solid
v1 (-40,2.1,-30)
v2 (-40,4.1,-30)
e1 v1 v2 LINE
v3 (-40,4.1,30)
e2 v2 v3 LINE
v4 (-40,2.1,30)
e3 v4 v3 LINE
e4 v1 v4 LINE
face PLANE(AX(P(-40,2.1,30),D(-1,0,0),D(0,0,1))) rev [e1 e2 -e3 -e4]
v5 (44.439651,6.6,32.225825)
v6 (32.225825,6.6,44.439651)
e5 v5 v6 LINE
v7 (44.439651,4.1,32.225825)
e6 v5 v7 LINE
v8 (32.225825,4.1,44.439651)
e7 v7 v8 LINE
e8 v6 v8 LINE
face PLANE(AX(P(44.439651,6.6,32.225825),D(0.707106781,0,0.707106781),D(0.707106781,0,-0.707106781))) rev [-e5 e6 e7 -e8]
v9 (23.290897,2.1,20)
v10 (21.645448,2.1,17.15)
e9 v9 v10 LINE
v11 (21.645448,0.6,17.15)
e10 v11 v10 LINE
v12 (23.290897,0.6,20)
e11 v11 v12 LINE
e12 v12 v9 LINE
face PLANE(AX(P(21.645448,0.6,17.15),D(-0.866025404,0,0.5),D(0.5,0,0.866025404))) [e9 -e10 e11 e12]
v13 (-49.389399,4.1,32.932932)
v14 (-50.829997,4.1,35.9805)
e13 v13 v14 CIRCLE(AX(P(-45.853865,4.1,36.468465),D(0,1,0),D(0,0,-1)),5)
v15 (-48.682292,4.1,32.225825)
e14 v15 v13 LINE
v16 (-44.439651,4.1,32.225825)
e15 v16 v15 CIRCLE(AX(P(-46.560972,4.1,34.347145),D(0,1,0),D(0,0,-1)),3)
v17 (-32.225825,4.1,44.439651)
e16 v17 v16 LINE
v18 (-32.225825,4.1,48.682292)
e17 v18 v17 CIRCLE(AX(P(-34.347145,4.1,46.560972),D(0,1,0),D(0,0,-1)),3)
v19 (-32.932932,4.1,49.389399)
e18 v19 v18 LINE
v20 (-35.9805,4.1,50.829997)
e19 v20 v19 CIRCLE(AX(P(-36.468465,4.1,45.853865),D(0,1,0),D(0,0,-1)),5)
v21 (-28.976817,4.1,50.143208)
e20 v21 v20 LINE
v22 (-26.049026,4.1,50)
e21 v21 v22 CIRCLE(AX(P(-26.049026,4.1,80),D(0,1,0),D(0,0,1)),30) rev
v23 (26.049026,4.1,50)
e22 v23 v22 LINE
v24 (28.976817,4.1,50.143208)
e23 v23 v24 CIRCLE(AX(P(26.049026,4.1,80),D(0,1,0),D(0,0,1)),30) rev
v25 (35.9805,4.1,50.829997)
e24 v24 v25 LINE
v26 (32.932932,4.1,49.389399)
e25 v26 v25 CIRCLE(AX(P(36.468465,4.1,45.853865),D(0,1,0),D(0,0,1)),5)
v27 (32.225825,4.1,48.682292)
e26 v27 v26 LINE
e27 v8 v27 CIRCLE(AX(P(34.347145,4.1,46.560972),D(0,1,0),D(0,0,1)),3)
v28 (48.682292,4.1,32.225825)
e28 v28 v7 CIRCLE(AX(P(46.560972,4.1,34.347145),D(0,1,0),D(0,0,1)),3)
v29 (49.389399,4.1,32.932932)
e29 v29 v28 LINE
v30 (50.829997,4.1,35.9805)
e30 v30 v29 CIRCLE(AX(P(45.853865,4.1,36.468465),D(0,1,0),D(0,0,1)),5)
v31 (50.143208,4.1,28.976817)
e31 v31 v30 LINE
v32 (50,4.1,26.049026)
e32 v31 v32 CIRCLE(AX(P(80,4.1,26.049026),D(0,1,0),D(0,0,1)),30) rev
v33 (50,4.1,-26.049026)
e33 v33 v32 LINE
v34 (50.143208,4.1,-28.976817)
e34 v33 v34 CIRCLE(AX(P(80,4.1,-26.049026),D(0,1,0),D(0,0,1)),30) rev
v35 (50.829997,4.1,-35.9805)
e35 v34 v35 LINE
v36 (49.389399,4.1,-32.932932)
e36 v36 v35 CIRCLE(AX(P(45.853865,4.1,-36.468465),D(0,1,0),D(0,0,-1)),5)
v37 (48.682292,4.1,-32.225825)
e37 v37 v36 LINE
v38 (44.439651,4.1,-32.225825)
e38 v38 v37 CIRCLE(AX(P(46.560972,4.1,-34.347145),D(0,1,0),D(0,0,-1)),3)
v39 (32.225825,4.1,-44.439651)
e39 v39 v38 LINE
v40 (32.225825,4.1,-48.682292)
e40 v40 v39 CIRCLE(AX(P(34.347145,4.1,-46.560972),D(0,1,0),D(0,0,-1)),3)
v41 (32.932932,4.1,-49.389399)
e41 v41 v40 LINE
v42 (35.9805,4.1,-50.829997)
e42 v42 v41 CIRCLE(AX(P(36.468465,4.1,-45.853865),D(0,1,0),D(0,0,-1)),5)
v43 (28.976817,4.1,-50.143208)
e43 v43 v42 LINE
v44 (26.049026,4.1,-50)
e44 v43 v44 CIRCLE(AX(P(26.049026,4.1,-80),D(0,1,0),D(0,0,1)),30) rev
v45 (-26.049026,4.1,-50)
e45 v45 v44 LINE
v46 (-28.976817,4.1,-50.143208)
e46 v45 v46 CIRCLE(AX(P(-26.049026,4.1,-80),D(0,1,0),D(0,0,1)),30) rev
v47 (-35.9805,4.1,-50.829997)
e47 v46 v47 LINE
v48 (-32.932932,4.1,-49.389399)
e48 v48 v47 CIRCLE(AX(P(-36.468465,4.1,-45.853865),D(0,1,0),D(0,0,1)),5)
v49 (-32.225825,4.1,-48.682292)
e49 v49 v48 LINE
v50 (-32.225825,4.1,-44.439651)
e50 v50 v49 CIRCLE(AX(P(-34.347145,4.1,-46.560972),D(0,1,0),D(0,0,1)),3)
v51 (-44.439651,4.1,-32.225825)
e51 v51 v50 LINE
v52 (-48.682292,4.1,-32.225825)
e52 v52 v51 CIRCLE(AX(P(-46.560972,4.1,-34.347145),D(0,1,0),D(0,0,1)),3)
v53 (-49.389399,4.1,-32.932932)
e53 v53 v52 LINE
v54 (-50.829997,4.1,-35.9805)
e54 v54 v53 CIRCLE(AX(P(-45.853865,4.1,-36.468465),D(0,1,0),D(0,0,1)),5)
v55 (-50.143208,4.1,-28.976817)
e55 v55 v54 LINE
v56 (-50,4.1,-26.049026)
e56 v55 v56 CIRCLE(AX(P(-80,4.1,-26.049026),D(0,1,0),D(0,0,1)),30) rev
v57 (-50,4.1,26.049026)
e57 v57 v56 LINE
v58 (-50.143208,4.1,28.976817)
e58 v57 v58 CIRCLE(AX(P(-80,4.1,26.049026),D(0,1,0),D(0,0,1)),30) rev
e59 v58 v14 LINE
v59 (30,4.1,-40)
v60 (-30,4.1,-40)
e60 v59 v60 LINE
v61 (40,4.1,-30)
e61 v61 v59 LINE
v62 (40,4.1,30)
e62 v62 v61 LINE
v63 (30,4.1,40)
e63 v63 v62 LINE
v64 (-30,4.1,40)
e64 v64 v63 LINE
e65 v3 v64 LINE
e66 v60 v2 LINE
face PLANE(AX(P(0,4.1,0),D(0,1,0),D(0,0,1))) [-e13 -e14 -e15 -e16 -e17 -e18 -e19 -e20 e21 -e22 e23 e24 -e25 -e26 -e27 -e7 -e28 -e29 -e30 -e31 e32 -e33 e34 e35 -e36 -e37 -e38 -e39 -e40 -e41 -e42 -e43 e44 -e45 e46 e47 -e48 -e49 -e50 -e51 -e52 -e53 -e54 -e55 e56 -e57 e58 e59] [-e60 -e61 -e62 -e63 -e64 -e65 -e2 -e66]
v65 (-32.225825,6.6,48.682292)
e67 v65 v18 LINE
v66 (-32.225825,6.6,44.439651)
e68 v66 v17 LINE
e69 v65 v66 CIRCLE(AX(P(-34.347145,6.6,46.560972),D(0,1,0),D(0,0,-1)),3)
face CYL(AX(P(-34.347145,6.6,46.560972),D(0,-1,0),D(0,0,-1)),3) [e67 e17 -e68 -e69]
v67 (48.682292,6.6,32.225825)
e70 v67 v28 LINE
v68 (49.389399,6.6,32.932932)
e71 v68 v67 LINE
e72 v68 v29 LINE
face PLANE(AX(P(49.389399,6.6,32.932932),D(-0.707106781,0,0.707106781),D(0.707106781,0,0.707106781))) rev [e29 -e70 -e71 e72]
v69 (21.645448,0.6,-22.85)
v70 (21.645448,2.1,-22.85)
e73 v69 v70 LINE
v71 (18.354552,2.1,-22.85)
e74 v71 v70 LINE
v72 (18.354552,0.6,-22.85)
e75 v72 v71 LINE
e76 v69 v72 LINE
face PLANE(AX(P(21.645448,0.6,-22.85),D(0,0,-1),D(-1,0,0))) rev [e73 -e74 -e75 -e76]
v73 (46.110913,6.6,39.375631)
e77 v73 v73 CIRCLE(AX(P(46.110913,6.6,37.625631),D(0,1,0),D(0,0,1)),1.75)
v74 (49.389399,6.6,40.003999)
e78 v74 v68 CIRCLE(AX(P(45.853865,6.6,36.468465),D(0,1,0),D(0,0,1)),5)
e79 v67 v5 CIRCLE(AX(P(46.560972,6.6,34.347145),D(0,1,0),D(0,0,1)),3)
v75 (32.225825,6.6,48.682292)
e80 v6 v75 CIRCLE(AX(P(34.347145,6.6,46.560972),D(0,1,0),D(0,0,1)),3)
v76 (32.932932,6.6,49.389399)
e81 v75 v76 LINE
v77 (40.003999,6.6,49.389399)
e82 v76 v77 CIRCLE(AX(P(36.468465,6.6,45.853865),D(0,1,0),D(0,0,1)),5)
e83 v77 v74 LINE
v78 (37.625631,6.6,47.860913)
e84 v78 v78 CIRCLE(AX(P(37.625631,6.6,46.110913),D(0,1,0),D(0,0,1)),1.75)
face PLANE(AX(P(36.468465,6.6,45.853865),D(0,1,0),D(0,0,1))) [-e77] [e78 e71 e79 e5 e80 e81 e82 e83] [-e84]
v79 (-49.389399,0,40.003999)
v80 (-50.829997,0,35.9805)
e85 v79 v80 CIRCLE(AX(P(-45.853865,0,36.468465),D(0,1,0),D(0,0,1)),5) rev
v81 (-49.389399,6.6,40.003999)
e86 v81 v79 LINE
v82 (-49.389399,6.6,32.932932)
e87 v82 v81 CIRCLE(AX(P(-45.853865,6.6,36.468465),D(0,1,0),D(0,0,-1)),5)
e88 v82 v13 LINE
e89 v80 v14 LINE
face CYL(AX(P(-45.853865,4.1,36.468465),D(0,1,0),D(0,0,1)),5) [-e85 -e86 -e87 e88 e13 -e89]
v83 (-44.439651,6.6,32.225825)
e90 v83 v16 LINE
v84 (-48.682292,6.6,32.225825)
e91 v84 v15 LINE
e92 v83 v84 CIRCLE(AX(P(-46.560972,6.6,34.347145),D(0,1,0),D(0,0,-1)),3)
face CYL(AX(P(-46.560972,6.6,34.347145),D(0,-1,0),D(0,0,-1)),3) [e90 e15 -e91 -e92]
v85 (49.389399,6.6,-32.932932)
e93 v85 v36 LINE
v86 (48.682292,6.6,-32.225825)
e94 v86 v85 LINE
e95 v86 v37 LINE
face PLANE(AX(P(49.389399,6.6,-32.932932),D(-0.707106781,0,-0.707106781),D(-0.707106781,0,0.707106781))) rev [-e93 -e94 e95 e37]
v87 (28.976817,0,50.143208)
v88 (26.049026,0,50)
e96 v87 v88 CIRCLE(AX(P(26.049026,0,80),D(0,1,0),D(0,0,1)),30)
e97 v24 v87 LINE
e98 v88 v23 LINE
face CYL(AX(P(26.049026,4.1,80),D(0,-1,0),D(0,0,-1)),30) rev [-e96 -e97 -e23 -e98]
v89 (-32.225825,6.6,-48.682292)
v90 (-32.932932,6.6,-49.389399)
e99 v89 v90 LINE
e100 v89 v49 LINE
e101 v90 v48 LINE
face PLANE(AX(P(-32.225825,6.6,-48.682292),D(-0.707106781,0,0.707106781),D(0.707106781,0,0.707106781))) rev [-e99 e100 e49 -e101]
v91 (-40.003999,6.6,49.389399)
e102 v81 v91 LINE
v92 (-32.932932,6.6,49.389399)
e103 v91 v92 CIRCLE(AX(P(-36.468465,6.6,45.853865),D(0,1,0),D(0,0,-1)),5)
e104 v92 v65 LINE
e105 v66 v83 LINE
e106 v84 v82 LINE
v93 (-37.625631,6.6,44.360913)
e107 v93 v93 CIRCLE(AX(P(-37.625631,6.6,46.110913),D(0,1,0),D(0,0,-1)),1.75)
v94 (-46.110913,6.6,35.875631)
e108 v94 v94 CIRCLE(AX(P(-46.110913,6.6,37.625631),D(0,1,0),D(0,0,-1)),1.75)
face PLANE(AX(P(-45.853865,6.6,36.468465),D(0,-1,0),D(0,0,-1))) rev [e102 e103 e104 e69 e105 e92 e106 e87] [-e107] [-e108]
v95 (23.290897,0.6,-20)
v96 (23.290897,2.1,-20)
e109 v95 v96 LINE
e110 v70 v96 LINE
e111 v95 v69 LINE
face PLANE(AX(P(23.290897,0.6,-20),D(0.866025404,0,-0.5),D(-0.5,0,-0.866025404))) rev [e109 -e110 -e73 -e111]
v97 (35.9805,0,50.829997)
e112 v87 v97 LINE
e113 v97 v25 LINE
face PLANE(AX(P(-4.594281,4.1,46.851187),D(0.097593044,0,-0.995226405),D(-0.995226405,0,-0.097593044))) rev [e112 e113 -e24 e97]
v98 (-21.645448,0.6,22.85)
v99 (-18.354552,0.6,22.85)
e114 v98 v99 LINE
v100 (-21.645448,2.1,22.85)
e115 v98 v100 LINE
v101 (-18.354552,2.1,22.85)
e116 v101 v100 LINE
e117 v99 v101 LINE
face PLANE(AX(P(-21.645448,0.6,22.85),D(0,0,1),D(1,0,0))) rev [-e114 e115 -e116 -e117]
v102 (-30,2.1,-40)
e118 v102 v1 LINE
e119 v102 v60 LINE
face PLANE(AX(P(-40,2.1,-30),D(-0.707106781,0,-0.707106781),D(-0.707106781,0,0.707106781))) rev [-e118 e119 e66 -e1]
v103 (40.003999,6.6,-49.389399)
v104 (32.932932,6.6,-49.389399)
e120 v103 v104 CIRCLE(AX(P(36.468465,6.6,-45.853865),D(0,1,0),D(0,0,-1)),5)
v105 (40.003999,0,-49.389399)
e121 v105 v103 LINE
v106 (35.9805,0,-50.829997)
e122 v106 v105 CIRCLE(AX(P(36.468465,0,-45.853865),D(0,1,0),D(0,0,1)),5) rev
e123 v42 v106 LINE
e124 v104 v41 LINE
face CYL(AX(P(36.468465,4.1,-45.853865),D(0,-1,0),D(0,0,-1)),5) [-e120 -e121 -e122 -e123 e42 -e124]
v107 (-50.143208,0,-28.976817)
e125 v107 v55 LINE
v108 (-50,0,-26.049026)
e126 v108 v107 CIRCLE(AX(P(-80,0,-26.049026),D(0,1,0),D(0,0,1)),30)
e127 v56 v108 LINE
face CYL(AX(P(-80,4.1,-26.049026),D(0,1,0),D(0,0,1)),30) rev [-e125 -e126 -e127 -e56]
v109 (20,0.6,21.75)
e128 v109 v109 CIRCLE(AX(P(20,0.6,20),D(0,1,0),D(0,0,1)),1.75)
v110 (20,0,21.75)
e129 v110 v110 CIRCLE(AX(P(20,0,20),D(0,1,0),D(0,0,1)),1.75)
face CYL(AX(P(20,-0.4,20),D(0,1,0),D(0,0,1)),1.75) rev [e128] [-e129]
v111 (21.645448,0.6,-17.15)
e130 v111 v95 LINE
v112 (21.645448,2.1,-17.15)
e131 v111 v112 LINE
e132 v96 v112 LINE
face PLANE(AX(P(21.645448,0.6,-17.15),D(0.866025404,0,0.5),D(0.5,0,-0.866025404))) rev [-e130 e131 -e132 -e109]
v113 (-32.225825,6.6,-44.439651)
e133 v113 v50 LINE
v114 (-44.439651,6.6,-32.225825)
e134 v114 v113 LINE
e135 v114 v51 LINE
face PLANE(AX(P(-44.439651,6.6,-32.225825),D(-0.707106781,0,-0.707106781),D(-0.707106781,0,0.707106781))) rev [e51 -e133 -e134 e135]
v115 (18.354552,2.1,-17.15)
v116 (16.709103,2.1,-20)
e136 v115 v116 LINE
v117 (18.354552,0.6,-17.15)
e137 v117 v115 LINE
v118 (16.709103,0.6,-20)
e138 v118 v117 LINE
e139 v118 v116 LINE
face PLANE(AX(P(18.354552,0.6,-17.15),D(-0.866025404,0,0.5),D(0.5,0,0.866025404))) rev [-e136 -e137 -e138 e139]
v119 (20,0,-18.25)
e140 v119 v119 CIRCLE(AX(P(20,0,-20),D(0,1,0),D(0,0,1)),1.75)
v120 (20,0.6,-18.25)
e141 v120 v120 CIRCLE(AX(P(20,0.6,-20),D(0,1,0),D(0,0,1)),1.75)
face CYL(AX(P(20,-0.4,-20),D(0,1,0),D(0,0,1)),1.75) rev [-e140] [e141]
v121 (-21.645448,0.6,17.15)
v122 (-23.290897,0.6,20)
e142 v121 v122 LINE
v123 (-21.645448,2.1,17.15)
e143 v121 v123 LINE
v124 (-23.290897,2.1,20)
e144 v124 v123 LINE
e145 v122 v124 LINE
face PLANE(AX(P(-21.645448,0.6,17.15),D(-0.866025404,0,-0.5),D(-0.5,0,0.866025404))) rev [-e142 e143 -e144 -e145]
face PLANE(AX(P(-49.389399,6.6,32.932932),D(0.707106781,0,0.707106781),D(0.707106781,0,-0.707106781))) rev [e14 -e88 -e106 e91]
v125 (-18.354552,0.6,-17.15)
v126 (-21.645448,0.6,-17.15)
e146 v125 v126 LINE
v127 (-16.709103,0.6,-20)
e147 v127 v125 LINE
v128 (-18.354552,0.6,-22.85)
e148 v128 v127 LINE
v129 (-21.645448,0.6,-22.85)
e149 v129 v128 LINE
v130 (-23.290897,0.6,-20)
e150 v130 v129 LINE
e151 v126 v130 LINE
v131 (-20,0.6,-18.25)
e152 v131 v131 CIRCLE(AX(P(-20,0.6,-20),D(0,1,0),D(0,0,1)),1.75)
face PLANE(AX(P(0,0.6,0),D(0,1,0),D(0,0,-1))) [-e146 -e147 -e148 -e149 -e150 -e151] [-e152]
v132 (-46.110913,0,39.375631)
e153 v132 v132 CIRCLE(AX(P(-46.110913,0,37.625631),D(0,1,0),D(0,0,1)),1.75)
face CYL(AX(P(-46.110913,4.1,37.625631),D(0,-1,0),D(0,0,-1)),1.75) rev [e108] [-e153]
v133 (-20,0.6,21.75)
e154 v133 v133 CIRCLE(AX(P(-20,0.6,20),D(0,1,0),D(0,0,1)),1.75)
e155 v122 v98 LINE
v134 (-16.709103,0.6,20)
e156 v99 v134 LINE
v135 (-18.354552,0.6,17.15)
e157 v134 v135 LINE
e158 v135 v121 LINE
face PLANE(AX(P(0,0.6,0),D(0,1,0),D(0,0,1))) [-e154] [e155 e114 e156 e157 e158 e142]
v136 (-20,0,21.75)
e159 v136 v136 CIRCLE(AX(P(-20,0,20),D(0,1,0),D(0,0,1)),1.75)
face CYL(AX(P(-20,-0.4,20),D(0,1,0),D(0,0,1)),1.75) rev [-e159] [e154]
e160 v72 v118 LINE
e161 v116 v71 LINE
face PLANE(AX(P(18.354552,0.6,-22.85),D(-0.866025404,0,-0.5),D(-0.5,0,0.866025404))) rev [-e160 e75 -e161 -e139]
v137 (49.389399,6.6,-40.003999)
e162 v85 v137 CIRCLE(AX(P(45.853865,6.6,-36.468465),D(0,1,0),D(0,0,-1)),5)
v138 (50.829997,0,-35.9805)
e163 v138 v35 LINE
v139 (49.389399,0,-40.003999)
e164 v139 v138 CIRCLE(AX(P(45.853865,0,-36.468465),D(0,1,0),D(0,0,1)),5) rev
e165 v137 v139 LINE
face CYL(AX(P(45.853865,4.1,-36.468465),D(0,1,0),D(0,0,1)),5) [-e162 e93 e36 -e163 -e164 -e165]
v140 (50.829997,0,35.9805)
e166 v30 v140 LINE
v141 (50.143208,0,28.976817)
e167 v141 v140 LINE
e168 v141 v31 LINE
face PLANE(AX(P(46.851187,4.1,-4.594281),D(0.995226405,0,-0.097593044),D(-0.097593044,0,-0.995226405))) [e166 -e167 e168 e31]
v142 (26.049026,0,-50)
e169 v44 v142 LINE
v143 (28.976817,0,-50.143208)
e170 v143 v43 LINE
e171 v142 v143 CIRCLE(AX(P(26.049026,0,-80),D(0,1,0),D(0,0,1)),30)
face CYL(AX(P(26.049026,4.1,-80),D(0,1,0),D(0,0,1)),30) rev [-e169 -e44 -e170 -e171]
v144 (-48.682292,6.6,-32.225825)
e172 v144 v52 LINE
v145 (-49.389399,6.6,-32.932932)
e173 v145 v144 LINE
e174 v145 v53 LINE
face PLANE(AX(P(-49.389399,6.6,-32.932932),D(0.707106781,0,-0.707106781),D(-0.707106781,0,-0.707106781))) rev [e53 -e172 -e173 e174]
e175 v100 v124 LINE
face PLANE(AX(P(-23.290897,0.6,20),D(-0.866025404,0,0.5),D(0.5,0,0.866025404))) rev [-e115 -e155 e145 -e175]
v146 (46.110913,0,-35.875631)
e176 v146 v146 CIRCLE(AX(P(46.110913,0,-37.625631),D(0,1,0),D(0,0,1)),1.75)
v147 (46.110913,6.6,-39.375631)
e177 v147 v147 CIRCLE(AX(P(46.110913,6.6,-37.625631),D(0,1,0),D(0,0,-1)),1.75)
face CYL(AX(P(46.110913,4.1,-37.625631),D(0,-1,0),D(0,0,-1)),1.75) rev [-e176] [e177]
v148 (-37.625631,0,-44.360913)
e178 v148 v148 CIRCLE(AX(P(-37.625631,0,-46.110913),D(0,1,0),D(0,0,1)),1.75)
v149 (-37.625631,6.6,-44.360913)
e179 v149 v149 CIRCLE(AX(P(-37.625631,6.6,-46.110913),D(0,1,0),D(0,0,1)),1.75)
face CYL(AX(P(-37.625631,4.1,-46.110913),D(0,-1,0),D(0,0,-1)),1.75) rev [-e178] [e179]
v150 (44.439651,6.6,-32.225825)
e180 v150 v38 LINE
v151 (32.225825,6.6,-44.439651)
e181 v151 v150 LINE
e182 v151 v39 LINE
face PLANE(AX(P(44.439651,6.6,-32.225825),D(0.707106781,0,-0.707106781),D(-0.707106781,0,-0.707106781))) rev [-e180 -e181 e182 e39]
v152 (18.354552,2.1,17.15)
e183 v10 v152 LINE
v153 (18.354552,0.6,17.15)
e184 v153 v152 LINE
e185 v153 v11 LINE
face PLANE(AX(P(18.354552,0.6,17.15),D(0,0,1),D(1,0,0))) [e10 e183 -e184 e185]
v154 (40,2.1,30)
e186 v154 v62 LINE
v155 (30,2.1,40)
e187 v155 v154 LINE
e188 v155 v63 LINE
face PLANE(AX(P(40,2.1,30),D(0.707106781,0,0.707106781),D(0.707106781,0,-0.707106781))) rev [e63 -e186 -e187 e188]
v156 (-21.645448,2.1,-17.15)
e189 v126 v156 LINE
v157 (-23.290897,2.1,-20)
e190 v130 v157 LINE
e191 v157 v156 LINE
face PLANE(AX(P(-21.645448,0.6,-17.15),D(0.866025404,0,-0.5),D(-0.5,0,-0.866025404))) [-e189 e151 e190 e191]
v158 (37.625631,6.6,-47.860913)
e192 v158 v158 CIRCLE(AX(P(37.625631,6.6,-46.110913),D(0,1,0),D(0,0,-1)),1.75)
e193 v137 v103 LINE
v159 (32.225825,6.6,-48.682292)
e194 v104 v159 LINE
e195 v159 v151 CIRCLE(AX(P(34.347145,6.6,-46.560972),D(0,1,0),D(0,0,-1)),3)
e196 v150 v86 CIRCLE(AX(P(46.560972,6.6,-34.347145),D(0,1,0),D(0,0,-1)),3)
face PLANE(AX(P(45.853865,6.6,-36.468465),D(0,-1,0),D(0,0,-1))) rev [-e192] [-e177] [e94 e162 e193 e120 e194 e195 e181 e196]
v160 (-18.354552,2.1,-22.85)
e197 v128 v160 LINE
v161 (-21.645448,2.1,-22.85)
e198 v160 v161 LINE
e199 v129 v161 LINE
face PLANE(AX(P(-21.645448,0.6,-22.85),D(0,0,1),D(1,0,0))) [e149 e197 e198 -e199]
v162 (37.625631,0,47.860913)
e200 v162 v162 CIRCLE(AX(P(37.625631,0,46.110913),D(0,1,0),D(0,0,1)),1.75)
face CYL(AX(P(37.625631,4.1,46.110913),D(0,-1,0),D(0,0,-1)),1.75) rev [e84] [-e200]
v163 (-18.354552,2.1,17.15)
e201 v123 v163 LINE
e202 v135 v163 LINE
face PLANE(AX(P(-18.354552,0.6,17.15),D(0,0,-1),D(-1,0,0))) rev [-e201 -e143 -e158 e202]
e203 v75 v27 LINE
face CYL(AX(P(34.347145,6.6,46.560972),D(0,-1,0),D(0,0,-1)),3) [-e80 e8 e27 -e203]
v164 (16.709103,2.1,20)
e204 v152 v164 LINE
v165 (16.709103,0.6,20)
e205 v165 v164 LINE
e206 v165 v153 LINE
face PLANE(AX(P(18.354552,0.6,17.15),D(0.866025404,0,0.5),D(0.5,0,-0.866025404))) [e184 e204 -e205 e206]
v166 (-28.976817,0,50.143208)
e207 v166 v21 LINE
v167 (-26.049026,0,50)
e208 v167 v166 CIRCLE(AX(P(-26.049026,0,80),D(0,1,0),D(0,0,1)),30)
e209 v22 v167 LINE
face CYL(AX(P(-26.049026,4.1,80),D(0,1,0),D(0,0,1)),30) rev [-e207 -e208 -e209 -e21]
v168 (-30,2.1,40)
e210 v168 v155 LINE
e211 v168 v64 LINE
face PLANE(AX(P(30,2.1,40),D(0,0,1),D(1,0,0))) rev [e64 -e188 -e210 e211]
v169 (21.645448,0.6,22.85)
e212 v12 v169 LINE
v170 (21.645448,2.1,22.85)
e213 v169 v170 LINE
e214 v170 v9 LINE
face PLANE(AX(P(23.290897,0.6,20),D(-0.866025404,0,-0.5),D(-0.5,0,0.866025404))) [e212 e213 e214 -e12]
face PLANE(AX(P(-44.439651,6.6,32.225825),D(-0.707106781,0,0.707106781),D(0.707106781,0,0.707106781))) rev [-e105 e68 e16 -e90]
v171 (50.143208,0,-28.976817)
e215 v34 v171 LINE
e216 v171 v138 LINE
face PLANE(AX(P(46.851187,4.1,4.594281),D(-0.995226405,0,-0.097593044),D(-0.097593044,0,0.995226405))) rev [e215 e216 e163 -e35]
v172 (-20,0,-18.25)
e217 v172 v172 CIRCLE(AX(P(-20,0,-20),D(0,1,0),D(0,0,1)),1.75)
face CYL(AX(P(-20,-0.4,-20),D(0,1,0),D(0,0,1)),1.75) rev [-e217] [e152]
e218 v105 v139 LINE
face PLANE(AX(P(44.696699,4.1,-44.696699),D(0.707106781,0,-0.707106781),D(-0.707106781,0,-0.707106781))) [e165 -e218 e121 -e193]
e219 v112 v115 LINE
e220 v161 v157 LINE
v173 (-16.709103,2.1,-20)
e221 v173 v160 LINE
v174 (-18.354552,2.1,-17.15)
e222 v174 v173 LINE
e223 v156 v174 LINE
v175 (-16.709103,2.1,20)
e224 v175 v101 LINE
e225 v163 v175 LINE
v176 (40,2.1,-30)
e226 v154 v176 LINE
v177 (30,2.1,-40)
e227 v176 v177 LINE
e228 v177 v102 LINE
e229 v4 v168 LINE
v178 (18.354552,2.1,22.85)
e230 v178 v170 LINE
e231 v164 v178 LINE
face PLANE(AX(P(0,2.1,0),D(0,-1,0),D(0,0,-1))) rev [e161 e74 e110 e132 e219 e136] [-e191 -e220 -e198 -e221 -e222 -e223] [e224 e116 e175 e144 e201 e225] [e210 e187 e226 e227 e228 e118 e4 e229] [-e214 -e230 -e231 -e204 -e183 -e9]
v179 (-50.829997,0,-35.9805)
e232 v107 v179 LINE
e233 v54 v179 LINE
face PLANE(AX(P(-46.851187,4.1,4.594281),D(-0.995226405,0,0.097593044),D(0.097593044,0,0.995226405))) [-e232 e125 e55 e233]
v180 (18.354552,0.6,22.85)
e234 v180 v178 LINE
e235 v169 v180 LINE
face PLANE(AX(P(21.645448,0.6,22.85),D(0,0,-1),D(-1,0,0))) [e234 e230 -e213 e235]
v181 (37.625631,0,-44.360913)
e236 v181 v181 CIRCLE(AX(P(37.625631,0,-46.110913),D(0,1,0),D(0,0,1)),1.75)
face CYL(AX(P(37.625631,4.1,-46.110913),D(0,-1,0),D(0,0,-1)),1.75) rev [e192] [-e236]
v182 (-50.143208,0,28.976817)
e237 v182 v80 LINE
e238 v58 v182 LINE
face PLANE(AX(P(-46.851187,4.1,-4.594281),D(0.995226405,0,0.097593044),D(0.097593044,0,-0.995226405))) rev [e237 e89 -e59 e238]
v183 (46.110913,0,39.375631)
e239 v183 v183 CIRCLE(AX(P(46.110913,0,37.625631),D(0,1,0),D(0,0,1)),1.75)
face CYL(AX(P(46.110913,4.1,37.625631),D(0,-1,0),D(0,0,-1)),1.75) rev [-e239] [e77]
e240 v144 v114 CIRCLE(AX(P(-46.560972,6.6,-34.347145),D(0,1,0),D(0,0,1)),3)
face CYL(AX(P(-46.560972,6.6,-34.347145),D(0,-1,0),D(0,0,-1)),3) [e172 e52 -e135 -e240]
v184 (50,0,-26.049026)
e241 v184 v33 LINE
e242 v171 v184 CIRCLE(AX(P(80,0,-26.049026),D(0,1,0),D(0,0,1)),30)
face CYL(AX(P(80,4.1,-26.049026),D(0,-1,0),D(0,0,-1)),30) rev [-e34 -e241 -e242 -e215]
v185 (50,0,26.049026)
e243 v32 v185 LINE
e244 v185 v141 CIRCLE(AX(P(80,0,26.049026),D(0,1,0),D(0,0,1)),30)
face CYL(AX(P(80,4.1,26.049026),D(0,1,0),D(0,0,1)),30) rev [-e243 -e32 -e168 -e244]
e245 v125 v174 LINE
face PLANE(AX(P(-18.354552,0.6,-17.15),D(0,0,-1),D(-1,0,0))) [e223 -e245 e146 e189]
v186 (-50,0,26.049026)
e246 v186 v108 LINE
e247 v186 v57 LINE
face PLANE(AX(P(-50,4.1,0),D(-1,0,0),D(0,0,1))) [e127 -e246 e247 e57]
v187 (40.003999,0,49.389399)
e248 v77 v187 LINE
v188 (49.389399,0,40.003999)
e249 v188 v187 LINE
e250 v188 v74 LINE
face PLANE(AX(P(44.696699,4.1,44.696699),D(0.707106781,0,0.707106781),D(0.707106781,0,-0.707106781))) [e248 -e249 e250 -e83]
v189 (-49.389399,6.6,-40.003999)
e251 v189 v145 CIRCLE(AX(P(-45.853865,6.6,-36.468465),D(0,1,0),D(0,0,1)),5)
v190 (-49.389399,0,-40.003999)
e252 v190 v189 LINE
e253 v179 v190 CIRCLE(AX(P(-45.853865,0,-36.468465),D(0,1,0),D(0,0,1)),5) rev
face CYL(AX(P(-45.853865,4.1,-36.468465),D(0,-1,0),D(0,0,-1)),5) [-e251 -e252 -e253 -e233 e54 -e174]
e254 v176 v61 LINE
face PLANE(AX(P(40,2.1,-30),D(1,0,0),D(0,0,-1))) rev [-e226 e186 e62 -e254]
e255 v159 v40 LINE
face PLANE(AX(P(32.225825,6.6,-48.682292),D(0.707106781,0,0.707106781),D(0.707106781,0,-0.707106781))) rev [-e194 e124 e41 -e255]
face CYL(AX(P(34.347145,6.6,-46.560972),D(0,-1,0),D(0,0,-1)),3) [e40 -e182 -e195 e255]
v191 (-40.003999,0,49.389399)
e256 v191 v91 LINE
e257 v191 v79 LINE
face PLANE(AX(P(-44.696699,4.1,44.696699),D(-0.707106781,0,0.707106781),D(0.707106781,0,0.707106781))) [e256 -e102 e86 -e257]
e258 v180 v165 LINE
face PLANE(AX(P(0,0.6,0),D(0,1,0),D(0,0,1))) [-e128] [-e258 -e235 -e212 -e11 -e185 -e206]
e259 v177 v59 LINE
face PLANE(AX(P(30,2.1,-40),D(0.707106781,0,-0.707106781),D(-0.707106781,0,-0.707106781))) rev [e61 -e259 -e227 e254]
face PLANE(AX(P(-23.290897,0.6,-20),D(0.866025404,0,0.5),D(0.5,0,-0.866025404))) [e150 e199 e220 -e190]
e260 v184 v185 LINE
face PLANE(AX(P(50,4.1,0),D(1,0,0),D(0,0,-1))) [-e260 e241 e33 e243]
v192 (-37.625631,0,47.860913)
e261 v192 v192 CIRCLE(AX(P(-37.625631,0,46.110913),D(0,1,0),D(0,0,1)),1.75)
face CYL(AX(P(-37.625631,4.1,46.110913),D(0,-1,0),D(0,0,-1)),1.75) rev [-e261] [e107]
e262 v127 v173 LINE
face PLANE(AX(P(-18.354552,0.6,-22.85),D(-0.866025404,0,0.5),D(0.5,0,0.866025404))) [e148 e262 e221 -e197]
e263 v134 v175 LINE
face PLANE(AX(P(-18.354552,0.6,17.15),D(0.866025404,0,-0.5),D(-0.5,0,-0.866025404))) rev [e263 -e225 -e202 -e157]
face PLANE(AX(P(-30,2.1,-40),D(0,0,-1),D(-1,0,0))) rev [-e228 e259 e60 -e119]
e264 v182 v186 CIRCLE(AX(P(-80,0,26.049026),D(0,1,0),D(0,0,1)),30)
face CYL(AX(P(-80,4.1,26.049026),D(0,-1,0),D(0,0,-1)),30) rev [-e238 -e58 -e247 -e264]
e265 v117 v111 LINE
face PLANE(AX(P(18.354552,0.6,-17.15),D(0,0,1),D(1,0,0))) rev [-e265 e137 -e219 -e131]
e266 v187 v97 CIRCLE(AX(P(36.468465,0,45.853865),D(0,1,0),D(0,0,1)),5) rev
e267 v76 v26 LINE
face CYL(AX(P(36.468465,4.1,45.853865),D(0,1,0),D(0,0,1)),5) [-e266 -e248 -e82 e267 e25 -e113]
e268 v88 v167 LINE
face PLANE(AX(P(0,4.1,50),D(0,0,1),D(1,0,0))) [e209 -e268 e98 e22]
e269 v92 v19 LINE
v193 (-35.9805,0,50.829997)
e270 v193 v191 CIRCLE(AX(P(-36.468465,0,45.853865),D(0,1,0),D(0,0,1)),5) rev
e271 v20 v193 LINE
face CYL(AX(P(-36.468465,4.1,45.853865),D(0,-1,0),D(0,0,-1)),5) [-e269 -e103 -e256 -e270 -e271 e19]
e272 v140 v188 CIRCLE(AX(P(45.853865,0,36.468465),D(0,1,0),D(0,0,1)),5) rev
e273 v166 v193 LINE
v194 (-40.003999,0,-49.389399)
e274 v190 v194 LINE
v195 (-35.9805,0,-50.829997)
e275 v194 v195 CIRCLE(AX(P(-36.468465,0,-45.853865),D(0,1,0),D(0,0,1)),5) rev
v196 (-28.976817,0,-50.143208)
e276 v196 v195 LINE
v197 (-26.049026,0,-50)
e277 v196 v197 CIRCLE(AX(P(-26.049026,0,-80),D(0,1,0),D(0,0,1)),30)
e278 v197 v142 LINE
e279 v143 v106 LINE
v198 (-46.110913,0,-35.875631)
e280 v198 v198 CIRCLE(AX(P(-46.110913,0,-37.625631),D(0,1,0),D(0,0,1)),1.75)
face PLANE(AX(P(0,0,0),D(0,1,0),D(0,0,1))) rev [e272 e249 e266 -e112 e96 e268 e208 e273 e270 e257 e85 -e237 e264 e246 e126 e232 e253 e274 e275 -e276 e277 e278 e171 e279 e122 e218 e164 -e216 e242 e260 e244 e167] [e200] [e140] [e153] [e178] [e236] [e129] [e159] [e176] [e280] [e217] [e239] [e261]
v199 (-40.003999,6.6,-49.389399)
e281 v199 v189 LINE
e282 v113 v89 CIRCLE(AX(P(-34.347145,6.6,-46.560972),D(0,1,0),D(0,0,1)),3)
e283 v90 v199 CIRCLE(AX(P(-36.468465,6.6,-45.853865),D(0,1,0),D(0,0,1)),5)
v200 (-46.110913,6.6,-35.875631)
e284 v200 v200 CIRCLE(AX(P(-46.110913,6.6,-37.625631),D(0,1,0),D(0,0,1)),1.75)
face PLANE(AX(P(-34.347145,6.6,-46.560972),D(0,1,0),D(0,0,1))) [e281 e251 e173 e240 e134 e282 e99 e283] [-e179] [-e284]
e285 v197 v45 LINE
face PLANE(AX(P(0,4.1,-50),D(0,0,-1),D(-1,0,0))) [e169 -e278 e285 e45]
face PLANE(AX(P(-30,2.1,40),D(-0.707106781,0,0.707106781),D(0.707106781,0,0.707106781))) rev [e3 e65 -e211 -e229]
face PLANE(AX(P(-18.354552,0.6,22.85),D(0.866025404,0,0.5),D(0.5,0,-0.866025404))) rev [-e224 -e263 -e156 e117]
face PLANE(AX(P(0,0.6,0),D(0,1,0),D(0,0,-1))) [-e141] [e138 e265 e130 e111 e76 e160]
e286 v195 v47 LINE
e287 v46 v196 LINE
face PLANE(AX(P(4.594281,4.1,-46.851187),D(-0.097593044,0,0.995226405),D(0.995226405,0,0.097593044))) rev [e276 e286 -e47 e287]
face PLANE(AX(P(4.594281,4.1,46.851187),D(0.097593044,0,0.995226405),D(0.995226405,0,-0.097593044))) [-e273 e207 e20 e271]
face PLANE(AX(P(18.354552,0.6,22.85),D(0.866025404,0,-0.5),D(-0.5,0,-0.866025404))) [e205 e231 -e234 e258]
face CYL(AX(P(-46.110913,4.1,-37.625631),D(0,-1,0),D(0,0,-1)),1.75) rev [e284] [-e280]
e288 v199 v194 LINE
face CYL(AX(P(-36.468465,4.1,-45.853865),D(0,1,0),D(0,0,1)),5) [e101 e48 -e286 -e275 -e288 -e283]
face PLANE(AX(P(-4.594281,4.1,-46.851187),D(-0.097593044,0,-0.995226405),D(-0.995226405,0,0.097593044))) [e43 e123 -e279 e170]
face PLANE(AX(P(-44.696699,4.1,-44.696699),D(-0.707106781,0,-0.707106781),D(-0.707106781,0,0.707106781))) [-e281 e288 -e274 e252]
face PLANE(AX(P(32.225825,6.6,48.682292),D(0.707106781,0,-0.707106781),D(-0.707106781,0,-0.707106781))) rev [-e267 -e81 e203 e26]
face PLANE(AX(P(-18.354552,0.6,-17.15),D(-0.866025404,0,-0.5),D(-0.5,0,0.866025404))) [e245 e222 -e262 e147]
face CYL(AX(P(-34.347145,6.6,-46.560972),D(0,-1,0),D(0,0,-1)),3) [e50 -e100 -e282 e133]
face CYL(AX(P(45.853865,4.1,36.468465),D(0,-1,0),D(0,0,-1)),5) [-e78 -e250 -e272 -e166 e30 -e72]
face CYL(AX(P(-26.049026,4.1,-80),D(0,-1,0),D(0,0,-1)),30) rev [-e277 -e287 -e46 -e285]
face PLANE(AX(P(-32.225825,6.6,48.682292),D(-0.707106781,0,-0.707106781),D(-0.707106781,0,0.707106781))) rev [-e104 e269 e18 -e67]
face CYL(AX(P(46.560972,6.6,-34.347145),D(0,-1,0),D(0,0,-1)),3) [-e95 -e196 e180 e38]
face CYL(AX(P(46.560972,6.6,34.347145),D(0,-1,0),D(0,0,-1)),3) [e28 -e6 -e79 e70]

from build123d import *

# Parameters (mm, degrees)
SKETCH1_R               = 1.75
BOSS_EXTRUDE1_DEPTH     = 4.1
CUT_EXTRUDE1_DEPTH      = 2
FILLET2_R               = 30
REDONDEO2_R             = 5
CORTAR_EXTRUIR1_DEPTH   = 3.5
SIMETR_A4_COPY_1_DEPTH  = 3.5
CROQUIS2_R              = 1.75
CORTAR_EXTRUIR2_DEPTH   = 2.5
CROQUIS3_R              = 1.75
SALIENTE_EXTRUIR1_DEPTH = 2.5


with BuildPart() as part:
    # Sketch1 → Boss-Extrude1 (new body)
    with BuildSketch(Plane(origin=(0, 0, 0), x_dir=(1, 0, 0), z_dir=(0, 1, 0))):
        Polygon((-27.516424079, 50), (27.516424079, 50), (38.33273811, 51.060660172), (51.060660172, 38.33273811), (50, 27.516424079), (50, -27.516424079), (51.060660172, -38.33273811), (38.33273811, -51.060660172), (27.516424079, -50), (-27.516424079, -50), (-38.33273811, -51.060660172), (-51.060660172, -38.33273811), (-50, -27.516424079), (-50, 27.516424079), (-51.060660172, 38.33273811), (-38.33273811, 51.060660172), align=None)
        with Locations(Location((-46.110912703, 37.625631329, 0), (0, 0, 270))):
            Circle(SKETCH1_R, mode=Mode.SUBTRACT)
        with Locations(Location((-37.625631329, 46.110912703, 0), (0, 0, 270))):
            Circle(SKETCH1_R, mode=Mode.SUBTRACT)
        with Locations(Location((-37.625631329, -46.110912703, 0), (0, 0, 270))):
            Circle(SKETCH1_R, mode=Mode.SUBTRACT)
        with Locations(Location((-46.110912703, -37.625631329, 0), (0, 0, 270))):
            Circle(SKETCH1_R, mode=Mode.SUBTRACT)
        with Locations(Location((46.110912703, -37.625631329, 0), (0, 0, 270))):
            Circle(SKETCH1_R, mode=Mode.SUBTRACT)
        with Locations(Location((37.625631329, -46.110912703, 0), (0, 0, 270))):
            Circle(SKETCH1_R, mode=Mode.SUBTRACT)
        with Locations(Location((46.110912703, 37.625631329, 0), (0, 0, 270))):
            Circle(SKETCH1_R, mode=Mode.SUBTRACT)
        with Locations(Location((37.625631329, 46.110912703, 0), (0, 0, 270))):
            Circle(SKETCH1_R, mode=Mode.SUBTRACT)
    extrude(amount=BOSS_EXTRUDE1_DEPTH)

    # Sketch2 → Cut-Extrude1 (cut)
    with BuildSketch(Plane(origin=(0, 4.1, 0), x_dir=(1, 0, 0), z_dir=(0, 1, 0))):
        Polygon((-40, -30), (-40, 30), (-30, 40), (30, 40), (40, 30), (40, -30), (30, -40), (-30, -40), align=None)
    extrude(amount=-CUT_EXTRUDE1_DEPTH, mode=Mode.SUBTRACT)

    # Fillet2
    # the kernel refuses this fillet: 30 mm, written as the material it adds along each edge
    with BuildSketch(Plane(origin=(27.516424079, 0, -50), x_dir=(-1, 0, 0), z_dir=(0, 1, 0)), Plane(origin=(50, 0, -27.516424079), x_dir=(0.09759304388656845, 0, -0.9952264052892459), z_dir=(0, 1, 0)), Plane(origin=(50, 0, 27.516424079), x_dir=(0, 0, -1), z_dir=(0, 1, 0)), Plane(origin=(27.516424079, 0, 50), x_dir=(0.9952264052892461, 0, 0.09759304388656681), z_dir=(0, 1, 0)), Plane(origin=(-27.516424079, 0, 50), x_dir=(1, 0, 0), z_dir=(0, 1, 0)), Plane(origin=(-50, 0, 27.516424079), x_dir=(-0.09759304388656528, 0, 0.9952264052892461), z_dir=(0, 1, 0)), Plane(origin=(-50, 0, -27.516424079), x_dir=(0, 0, 1), z_dir=(0, 1, 0))) as fillet2_piece_1:
        with BuildLine():
            CenterArc((FILLET2_R * 0.048913268002, -FILLET2_R), FILLET2_R, 90, 5.600584003)
            Line((-FILLET2_R * 0.0486797758846, -FILLET2_R * 0.00477359471075), (0, 0))
            Line((0, 0), (FILLET2_R * 0.048913268002, 0))
        make_face()
    extrude(amount=4.1)
    with BuildSketch(Plane(origin=(-27.516424079, 0, -50), x_dir=(1, 0, 0), z_dir=(0, 1, 0))) as fillet2_piece_2:
        with BuildLine():
            CenterArc((FILLET2_R * 0.048913268002, FILLET2_R), FILLET2_R, 264.399415997, 5.600584003)
            Line((-FILLET2_R * 0.0486797758846, FILLET2_R * 0.00477359471075), (0, 0))
            Line((0, 0), (FILLET2_R * 0.048913268002, 0))
        make_face()
    extrude(amount=4.1)

    # Redondeo2
    redondeo2_edges = [part.edges().sort_by_distance(p)[0] for p in [
        (38.33273811, 2.05, -51.060660172),
        (51.060660172, 2.05, -38.33273811),
        (51.060660172, 2.05, 38.33273811),
        (38.33273811, 2.05, 51.060660172),
        (-38.33273811, 2.05, 51.060660172),
        (-51.060660172, 2.05, 38.33273811),
        (-51.060660172, 2.05, -38.33273811),
        (-38.33273811, 2.05, -51.060660172),
    ]]
    fillet(redondeo2_edges, radius=REDONDEO2_R)

    # Croquis1 → Cortar-Extruir1 (cut)
    with BuildSketch(Plane(origin=(0, 4.1, 0), x_dir=(1, 0, 0), z_dir=(0, 1, 0))):
        Polygon((-18.354551733, -17.15), (-16.709103466, -20), (-18.354551733, -22.85), (-21.645448267, -22.85), (-23.290896534, -20), (-21.645448267, -17.15), align=None)
    cortar_extruir1 = extrude(amount=-CORTAR_EXTRUIR1_DEPTH, mode=Mode.SUBTRACT)

    # Simetría3: Cortar-Extruir1 across plane
    add(cortar_extruir1.mirror(Plane(origin=(0, 0, 0), x_dir=(0, 0, 1), z_dir=(1, 0, 0))), mode=Mode.SUBTRACT)

    # Simetría4: Cortar-Extruir1 across plane
    add(cortar_extruir1.mirror(Plane.XY), mode=Mode.SUBTRACT)

    # Simetría4 copy 1 sketch → Simetría4 copy 1 (cut)
    with BuildSketch(Plane(origin=(0, 4.1, 0), x_dir=(-1, 0, 0), z_dir=(0, 1, 0))):
        Polygon((-18.354551733, -17.15), (-16.709103466, -20), (-18.354551733, -22.85), (-21.645448267, -22.85), (-23.290896534, -20), (-21.645448267, -17.15), align=None)
    extrude(amount=-SIMETR_A4_COPY_1_DEPTH, mode=Mode.SUBTRACT)

    # Croquis2 → Cortar-Extruir2 (cut)
    with BuildSketch(Plane(origin=(0, 2.1, 0), x_dir=(1, 0, 0), z_dir=(0, 1, 0))):
        with Locations(Location((-20, -20, 0), (0, 0, 270))):
            Circle(CROQUIS2_R)
        with Locations(Location((-20, 20, 0), (0, 0, 270))):
            Circle(CROQUIS2_R)
        with Locations(Location((20, 20, 0), (0, 0, 270))):
            Circle(CROQUIS2_R)
        with Locations(Location((20, -20, 0), (0, 0, 270))):
            Circle(CROQUIS2_R)
    extrude(amount=-CORTAR_EXTRUIR2_DEPTH, mode=Mode.SUBTRACT)

    # Croquis3 → Saliente-Extruir1 (add)
    # profile 1 of 4: a face of its own
    with BuildSketch(Plane(origin=(0, 4.1, 0), x_dir=(1, 0, 0), z_dir=(0, 1, 0))):
        with BuildLine():
            Line((-49.389398906, 32.932931564), (-48.682292125, 32.225824783))
            ThreePointArc((-48.682292125, 32.225824783), (-46.560971781, 31.347145126), (-44.439651438, 32.225824783))
            Line((-44.439651438, 32.225824783), (-32.225824783, 44.439651438))
            ThreePointArc((-32.225824783, 44.439651438), (-31.347145126, 46.560971781), (-32.225824783, 48.682292125))
            Line((-32.225824783, 48.682292125), (-32.932931564, 49.389398906))
            ThreePointArc((-32.932931564, 49.389398906), (-36.46846547, 50.853865), (-40.003999376, 49.389398906))
            Line((-40.003999376, 49.389398906), (-49.389398906, 40.003999376))
            ThreePointArc((-49.389398906, 40.003999376), (-50.853865, 36.46846547), (-49.389398906, 32.932931564))
        make_face()
        with Locations(Location((-37.625631329, 46.110912703, 0), (0, 0, 270))):
            Circle(CROQUIS3_R, mode=Mode.SUBTRACT)
        with Locations(Location((-46.110912703, 37.625631329, 0), (0, 0, 270))):
            Circle(CROQUIS3_R, mode=Mode.SUBTRACT)
    # profile 2 of 4: a face of its own
    with BuildSketch(Plane(origin=(0, 4.1, 0), x_dir=(1, 0, 0), z_dir=(0, 1, 0))):
        with BuildLine():
            Line((-40.003999376, -49.389398906), (-49.389398906, -40.003999376))
            ThreePointArc((-49.389398906, -40.003999376), (-50.853865, -36.46846547), (-49.389398906, -32.932931564))
            Line((-49.389398906, -32.932931564), (-48.682292125, -32.225824783))
            ThreePointArc((-48.682292125, -32.225824783), (-46.560971781, -31.347145126), (-44.439651438, -32.225824783))
            Line((-44.439651438, -32.225824783), (-32.225824783, -44.439651438))
            ThreePointArc((-32.225824783, -44.439651438), (-31.347145126, -46.560971781), (-32.225824783, -48.682292125))
            Line((-32.225824783, -48.682292125), (-32.932931564, -49.389398906))
            ThreePointArc((-32.932931564, -49.389398906), (-36.46846547, -50.853865), (-40.003999376, -49.389398906))
        make_face()
        with Locations(Location((-46.110912703, -37.625631329, 0), (0, 0, 90))):
            Circle(CROQUIS3_R, mode=Mode.SUBTRACT)
        with Locations(Location((-37.625631329, -46.110912703, 0), (0, 0, 90))):
            Circle(CROQUIS3_R, mode=Mode.SUBTRACT)
    # profile 3 of 4: a face of its own
    with BuildSketch(Plane(origin=(0, 4.1, 0), x_dir=(1, 0, 0), z_dir=(0, 1, 0))):
        with BuildLine():
            Line((40.003999376, 49.389398906), (49.389398906, 40.003999376))
            ThreePointArc((49.389398906, 40.003999376), (50.853865, 36.46846547), (49.389398906, 32.932931564))
            Line((49.389398906, 32.932931564), (48.682292125, 32.225824783))
            ThreePointArc((48.682292125, 32.225824783), (46.560971781, 31.347145126), (44.439651438, 32.225824783))
            Line((44.439651438, 32.225824783), (32.225824783, 44.439651438))
            ThreePointArc((32.225824783, 44.439651438), (31.347145126, 46.560971781), (32.225824783, 48.682292125))
            Line((32.225824783, 48.682292125), (32.932931564, 49.389398906))
            ThreePointArc((32.932931564, 49.389398906), (36.46846547, 50.853865), (40.003999376, 49.389398906))
        make_face()
        with Locations(Location((46.110912703, 37.625631329, 0), (0, 0, 90))):
            Circle(CROQUIS3_R, mode=Mode.SUBTRACT)
        with Locations(Location((37.625631329, 46.110912703, 0), (0, 0, 90))):
            Circle(CROQUIS3_R, mode=Mode.SUBTRACT)
    # profile 4 of 4: a face of its own
    with BuildSketch(Plane(origin=(0, 4.1, 0), x_dir=(1, 0, 0), z_dir=(0, 1, 0))):
        with BuildLine():
            Line((49.389398906, -32.932931564), (48.682292125, -32.225824783))
            ThreePointArc((48.682292125, -32.225824783), (46.560971781, -31.347145126), (44.439651438, -32.225824783))
            Line((44.439651438, -32.225824783), (32.225824783, -44.439651438))
            ThreePointArc((32.225824783, -44.439651438), (31.347145126, -46.560971781), (32.225824783, -48.682292125))
            Line((32.225824783, -48.682292125), (32.932931564, -49.389398906))
            ThreePointArc((32.932931564, -49.389398906), (36.46846547, -50.853865), (40.003999376, -49.389398906))
            Line((40.003999376, -49.389398906), (49.389398906, -40.003999376))
            ThreePointArc((49.389398906, -40.003999376), (50.853865, -36.46846547), (49.389398906, -32.932931564))
        make_face()
        with Locations(Location((37.625631329, -46.110912703, 0), (0, 0, 270))):
            Circle(CROQUIS3_R, mode=Mode.SUBTRACT)
        with Locations(Location((46.110912703, -37.625631329, 0), (0, 0, 270))):
            Circle(CROQUIS3_R, mode=Mode.SUBTRACT)
    extrude(amount=SALIENTE_EXTRUIR1_DEPTH)


solid = part.part
